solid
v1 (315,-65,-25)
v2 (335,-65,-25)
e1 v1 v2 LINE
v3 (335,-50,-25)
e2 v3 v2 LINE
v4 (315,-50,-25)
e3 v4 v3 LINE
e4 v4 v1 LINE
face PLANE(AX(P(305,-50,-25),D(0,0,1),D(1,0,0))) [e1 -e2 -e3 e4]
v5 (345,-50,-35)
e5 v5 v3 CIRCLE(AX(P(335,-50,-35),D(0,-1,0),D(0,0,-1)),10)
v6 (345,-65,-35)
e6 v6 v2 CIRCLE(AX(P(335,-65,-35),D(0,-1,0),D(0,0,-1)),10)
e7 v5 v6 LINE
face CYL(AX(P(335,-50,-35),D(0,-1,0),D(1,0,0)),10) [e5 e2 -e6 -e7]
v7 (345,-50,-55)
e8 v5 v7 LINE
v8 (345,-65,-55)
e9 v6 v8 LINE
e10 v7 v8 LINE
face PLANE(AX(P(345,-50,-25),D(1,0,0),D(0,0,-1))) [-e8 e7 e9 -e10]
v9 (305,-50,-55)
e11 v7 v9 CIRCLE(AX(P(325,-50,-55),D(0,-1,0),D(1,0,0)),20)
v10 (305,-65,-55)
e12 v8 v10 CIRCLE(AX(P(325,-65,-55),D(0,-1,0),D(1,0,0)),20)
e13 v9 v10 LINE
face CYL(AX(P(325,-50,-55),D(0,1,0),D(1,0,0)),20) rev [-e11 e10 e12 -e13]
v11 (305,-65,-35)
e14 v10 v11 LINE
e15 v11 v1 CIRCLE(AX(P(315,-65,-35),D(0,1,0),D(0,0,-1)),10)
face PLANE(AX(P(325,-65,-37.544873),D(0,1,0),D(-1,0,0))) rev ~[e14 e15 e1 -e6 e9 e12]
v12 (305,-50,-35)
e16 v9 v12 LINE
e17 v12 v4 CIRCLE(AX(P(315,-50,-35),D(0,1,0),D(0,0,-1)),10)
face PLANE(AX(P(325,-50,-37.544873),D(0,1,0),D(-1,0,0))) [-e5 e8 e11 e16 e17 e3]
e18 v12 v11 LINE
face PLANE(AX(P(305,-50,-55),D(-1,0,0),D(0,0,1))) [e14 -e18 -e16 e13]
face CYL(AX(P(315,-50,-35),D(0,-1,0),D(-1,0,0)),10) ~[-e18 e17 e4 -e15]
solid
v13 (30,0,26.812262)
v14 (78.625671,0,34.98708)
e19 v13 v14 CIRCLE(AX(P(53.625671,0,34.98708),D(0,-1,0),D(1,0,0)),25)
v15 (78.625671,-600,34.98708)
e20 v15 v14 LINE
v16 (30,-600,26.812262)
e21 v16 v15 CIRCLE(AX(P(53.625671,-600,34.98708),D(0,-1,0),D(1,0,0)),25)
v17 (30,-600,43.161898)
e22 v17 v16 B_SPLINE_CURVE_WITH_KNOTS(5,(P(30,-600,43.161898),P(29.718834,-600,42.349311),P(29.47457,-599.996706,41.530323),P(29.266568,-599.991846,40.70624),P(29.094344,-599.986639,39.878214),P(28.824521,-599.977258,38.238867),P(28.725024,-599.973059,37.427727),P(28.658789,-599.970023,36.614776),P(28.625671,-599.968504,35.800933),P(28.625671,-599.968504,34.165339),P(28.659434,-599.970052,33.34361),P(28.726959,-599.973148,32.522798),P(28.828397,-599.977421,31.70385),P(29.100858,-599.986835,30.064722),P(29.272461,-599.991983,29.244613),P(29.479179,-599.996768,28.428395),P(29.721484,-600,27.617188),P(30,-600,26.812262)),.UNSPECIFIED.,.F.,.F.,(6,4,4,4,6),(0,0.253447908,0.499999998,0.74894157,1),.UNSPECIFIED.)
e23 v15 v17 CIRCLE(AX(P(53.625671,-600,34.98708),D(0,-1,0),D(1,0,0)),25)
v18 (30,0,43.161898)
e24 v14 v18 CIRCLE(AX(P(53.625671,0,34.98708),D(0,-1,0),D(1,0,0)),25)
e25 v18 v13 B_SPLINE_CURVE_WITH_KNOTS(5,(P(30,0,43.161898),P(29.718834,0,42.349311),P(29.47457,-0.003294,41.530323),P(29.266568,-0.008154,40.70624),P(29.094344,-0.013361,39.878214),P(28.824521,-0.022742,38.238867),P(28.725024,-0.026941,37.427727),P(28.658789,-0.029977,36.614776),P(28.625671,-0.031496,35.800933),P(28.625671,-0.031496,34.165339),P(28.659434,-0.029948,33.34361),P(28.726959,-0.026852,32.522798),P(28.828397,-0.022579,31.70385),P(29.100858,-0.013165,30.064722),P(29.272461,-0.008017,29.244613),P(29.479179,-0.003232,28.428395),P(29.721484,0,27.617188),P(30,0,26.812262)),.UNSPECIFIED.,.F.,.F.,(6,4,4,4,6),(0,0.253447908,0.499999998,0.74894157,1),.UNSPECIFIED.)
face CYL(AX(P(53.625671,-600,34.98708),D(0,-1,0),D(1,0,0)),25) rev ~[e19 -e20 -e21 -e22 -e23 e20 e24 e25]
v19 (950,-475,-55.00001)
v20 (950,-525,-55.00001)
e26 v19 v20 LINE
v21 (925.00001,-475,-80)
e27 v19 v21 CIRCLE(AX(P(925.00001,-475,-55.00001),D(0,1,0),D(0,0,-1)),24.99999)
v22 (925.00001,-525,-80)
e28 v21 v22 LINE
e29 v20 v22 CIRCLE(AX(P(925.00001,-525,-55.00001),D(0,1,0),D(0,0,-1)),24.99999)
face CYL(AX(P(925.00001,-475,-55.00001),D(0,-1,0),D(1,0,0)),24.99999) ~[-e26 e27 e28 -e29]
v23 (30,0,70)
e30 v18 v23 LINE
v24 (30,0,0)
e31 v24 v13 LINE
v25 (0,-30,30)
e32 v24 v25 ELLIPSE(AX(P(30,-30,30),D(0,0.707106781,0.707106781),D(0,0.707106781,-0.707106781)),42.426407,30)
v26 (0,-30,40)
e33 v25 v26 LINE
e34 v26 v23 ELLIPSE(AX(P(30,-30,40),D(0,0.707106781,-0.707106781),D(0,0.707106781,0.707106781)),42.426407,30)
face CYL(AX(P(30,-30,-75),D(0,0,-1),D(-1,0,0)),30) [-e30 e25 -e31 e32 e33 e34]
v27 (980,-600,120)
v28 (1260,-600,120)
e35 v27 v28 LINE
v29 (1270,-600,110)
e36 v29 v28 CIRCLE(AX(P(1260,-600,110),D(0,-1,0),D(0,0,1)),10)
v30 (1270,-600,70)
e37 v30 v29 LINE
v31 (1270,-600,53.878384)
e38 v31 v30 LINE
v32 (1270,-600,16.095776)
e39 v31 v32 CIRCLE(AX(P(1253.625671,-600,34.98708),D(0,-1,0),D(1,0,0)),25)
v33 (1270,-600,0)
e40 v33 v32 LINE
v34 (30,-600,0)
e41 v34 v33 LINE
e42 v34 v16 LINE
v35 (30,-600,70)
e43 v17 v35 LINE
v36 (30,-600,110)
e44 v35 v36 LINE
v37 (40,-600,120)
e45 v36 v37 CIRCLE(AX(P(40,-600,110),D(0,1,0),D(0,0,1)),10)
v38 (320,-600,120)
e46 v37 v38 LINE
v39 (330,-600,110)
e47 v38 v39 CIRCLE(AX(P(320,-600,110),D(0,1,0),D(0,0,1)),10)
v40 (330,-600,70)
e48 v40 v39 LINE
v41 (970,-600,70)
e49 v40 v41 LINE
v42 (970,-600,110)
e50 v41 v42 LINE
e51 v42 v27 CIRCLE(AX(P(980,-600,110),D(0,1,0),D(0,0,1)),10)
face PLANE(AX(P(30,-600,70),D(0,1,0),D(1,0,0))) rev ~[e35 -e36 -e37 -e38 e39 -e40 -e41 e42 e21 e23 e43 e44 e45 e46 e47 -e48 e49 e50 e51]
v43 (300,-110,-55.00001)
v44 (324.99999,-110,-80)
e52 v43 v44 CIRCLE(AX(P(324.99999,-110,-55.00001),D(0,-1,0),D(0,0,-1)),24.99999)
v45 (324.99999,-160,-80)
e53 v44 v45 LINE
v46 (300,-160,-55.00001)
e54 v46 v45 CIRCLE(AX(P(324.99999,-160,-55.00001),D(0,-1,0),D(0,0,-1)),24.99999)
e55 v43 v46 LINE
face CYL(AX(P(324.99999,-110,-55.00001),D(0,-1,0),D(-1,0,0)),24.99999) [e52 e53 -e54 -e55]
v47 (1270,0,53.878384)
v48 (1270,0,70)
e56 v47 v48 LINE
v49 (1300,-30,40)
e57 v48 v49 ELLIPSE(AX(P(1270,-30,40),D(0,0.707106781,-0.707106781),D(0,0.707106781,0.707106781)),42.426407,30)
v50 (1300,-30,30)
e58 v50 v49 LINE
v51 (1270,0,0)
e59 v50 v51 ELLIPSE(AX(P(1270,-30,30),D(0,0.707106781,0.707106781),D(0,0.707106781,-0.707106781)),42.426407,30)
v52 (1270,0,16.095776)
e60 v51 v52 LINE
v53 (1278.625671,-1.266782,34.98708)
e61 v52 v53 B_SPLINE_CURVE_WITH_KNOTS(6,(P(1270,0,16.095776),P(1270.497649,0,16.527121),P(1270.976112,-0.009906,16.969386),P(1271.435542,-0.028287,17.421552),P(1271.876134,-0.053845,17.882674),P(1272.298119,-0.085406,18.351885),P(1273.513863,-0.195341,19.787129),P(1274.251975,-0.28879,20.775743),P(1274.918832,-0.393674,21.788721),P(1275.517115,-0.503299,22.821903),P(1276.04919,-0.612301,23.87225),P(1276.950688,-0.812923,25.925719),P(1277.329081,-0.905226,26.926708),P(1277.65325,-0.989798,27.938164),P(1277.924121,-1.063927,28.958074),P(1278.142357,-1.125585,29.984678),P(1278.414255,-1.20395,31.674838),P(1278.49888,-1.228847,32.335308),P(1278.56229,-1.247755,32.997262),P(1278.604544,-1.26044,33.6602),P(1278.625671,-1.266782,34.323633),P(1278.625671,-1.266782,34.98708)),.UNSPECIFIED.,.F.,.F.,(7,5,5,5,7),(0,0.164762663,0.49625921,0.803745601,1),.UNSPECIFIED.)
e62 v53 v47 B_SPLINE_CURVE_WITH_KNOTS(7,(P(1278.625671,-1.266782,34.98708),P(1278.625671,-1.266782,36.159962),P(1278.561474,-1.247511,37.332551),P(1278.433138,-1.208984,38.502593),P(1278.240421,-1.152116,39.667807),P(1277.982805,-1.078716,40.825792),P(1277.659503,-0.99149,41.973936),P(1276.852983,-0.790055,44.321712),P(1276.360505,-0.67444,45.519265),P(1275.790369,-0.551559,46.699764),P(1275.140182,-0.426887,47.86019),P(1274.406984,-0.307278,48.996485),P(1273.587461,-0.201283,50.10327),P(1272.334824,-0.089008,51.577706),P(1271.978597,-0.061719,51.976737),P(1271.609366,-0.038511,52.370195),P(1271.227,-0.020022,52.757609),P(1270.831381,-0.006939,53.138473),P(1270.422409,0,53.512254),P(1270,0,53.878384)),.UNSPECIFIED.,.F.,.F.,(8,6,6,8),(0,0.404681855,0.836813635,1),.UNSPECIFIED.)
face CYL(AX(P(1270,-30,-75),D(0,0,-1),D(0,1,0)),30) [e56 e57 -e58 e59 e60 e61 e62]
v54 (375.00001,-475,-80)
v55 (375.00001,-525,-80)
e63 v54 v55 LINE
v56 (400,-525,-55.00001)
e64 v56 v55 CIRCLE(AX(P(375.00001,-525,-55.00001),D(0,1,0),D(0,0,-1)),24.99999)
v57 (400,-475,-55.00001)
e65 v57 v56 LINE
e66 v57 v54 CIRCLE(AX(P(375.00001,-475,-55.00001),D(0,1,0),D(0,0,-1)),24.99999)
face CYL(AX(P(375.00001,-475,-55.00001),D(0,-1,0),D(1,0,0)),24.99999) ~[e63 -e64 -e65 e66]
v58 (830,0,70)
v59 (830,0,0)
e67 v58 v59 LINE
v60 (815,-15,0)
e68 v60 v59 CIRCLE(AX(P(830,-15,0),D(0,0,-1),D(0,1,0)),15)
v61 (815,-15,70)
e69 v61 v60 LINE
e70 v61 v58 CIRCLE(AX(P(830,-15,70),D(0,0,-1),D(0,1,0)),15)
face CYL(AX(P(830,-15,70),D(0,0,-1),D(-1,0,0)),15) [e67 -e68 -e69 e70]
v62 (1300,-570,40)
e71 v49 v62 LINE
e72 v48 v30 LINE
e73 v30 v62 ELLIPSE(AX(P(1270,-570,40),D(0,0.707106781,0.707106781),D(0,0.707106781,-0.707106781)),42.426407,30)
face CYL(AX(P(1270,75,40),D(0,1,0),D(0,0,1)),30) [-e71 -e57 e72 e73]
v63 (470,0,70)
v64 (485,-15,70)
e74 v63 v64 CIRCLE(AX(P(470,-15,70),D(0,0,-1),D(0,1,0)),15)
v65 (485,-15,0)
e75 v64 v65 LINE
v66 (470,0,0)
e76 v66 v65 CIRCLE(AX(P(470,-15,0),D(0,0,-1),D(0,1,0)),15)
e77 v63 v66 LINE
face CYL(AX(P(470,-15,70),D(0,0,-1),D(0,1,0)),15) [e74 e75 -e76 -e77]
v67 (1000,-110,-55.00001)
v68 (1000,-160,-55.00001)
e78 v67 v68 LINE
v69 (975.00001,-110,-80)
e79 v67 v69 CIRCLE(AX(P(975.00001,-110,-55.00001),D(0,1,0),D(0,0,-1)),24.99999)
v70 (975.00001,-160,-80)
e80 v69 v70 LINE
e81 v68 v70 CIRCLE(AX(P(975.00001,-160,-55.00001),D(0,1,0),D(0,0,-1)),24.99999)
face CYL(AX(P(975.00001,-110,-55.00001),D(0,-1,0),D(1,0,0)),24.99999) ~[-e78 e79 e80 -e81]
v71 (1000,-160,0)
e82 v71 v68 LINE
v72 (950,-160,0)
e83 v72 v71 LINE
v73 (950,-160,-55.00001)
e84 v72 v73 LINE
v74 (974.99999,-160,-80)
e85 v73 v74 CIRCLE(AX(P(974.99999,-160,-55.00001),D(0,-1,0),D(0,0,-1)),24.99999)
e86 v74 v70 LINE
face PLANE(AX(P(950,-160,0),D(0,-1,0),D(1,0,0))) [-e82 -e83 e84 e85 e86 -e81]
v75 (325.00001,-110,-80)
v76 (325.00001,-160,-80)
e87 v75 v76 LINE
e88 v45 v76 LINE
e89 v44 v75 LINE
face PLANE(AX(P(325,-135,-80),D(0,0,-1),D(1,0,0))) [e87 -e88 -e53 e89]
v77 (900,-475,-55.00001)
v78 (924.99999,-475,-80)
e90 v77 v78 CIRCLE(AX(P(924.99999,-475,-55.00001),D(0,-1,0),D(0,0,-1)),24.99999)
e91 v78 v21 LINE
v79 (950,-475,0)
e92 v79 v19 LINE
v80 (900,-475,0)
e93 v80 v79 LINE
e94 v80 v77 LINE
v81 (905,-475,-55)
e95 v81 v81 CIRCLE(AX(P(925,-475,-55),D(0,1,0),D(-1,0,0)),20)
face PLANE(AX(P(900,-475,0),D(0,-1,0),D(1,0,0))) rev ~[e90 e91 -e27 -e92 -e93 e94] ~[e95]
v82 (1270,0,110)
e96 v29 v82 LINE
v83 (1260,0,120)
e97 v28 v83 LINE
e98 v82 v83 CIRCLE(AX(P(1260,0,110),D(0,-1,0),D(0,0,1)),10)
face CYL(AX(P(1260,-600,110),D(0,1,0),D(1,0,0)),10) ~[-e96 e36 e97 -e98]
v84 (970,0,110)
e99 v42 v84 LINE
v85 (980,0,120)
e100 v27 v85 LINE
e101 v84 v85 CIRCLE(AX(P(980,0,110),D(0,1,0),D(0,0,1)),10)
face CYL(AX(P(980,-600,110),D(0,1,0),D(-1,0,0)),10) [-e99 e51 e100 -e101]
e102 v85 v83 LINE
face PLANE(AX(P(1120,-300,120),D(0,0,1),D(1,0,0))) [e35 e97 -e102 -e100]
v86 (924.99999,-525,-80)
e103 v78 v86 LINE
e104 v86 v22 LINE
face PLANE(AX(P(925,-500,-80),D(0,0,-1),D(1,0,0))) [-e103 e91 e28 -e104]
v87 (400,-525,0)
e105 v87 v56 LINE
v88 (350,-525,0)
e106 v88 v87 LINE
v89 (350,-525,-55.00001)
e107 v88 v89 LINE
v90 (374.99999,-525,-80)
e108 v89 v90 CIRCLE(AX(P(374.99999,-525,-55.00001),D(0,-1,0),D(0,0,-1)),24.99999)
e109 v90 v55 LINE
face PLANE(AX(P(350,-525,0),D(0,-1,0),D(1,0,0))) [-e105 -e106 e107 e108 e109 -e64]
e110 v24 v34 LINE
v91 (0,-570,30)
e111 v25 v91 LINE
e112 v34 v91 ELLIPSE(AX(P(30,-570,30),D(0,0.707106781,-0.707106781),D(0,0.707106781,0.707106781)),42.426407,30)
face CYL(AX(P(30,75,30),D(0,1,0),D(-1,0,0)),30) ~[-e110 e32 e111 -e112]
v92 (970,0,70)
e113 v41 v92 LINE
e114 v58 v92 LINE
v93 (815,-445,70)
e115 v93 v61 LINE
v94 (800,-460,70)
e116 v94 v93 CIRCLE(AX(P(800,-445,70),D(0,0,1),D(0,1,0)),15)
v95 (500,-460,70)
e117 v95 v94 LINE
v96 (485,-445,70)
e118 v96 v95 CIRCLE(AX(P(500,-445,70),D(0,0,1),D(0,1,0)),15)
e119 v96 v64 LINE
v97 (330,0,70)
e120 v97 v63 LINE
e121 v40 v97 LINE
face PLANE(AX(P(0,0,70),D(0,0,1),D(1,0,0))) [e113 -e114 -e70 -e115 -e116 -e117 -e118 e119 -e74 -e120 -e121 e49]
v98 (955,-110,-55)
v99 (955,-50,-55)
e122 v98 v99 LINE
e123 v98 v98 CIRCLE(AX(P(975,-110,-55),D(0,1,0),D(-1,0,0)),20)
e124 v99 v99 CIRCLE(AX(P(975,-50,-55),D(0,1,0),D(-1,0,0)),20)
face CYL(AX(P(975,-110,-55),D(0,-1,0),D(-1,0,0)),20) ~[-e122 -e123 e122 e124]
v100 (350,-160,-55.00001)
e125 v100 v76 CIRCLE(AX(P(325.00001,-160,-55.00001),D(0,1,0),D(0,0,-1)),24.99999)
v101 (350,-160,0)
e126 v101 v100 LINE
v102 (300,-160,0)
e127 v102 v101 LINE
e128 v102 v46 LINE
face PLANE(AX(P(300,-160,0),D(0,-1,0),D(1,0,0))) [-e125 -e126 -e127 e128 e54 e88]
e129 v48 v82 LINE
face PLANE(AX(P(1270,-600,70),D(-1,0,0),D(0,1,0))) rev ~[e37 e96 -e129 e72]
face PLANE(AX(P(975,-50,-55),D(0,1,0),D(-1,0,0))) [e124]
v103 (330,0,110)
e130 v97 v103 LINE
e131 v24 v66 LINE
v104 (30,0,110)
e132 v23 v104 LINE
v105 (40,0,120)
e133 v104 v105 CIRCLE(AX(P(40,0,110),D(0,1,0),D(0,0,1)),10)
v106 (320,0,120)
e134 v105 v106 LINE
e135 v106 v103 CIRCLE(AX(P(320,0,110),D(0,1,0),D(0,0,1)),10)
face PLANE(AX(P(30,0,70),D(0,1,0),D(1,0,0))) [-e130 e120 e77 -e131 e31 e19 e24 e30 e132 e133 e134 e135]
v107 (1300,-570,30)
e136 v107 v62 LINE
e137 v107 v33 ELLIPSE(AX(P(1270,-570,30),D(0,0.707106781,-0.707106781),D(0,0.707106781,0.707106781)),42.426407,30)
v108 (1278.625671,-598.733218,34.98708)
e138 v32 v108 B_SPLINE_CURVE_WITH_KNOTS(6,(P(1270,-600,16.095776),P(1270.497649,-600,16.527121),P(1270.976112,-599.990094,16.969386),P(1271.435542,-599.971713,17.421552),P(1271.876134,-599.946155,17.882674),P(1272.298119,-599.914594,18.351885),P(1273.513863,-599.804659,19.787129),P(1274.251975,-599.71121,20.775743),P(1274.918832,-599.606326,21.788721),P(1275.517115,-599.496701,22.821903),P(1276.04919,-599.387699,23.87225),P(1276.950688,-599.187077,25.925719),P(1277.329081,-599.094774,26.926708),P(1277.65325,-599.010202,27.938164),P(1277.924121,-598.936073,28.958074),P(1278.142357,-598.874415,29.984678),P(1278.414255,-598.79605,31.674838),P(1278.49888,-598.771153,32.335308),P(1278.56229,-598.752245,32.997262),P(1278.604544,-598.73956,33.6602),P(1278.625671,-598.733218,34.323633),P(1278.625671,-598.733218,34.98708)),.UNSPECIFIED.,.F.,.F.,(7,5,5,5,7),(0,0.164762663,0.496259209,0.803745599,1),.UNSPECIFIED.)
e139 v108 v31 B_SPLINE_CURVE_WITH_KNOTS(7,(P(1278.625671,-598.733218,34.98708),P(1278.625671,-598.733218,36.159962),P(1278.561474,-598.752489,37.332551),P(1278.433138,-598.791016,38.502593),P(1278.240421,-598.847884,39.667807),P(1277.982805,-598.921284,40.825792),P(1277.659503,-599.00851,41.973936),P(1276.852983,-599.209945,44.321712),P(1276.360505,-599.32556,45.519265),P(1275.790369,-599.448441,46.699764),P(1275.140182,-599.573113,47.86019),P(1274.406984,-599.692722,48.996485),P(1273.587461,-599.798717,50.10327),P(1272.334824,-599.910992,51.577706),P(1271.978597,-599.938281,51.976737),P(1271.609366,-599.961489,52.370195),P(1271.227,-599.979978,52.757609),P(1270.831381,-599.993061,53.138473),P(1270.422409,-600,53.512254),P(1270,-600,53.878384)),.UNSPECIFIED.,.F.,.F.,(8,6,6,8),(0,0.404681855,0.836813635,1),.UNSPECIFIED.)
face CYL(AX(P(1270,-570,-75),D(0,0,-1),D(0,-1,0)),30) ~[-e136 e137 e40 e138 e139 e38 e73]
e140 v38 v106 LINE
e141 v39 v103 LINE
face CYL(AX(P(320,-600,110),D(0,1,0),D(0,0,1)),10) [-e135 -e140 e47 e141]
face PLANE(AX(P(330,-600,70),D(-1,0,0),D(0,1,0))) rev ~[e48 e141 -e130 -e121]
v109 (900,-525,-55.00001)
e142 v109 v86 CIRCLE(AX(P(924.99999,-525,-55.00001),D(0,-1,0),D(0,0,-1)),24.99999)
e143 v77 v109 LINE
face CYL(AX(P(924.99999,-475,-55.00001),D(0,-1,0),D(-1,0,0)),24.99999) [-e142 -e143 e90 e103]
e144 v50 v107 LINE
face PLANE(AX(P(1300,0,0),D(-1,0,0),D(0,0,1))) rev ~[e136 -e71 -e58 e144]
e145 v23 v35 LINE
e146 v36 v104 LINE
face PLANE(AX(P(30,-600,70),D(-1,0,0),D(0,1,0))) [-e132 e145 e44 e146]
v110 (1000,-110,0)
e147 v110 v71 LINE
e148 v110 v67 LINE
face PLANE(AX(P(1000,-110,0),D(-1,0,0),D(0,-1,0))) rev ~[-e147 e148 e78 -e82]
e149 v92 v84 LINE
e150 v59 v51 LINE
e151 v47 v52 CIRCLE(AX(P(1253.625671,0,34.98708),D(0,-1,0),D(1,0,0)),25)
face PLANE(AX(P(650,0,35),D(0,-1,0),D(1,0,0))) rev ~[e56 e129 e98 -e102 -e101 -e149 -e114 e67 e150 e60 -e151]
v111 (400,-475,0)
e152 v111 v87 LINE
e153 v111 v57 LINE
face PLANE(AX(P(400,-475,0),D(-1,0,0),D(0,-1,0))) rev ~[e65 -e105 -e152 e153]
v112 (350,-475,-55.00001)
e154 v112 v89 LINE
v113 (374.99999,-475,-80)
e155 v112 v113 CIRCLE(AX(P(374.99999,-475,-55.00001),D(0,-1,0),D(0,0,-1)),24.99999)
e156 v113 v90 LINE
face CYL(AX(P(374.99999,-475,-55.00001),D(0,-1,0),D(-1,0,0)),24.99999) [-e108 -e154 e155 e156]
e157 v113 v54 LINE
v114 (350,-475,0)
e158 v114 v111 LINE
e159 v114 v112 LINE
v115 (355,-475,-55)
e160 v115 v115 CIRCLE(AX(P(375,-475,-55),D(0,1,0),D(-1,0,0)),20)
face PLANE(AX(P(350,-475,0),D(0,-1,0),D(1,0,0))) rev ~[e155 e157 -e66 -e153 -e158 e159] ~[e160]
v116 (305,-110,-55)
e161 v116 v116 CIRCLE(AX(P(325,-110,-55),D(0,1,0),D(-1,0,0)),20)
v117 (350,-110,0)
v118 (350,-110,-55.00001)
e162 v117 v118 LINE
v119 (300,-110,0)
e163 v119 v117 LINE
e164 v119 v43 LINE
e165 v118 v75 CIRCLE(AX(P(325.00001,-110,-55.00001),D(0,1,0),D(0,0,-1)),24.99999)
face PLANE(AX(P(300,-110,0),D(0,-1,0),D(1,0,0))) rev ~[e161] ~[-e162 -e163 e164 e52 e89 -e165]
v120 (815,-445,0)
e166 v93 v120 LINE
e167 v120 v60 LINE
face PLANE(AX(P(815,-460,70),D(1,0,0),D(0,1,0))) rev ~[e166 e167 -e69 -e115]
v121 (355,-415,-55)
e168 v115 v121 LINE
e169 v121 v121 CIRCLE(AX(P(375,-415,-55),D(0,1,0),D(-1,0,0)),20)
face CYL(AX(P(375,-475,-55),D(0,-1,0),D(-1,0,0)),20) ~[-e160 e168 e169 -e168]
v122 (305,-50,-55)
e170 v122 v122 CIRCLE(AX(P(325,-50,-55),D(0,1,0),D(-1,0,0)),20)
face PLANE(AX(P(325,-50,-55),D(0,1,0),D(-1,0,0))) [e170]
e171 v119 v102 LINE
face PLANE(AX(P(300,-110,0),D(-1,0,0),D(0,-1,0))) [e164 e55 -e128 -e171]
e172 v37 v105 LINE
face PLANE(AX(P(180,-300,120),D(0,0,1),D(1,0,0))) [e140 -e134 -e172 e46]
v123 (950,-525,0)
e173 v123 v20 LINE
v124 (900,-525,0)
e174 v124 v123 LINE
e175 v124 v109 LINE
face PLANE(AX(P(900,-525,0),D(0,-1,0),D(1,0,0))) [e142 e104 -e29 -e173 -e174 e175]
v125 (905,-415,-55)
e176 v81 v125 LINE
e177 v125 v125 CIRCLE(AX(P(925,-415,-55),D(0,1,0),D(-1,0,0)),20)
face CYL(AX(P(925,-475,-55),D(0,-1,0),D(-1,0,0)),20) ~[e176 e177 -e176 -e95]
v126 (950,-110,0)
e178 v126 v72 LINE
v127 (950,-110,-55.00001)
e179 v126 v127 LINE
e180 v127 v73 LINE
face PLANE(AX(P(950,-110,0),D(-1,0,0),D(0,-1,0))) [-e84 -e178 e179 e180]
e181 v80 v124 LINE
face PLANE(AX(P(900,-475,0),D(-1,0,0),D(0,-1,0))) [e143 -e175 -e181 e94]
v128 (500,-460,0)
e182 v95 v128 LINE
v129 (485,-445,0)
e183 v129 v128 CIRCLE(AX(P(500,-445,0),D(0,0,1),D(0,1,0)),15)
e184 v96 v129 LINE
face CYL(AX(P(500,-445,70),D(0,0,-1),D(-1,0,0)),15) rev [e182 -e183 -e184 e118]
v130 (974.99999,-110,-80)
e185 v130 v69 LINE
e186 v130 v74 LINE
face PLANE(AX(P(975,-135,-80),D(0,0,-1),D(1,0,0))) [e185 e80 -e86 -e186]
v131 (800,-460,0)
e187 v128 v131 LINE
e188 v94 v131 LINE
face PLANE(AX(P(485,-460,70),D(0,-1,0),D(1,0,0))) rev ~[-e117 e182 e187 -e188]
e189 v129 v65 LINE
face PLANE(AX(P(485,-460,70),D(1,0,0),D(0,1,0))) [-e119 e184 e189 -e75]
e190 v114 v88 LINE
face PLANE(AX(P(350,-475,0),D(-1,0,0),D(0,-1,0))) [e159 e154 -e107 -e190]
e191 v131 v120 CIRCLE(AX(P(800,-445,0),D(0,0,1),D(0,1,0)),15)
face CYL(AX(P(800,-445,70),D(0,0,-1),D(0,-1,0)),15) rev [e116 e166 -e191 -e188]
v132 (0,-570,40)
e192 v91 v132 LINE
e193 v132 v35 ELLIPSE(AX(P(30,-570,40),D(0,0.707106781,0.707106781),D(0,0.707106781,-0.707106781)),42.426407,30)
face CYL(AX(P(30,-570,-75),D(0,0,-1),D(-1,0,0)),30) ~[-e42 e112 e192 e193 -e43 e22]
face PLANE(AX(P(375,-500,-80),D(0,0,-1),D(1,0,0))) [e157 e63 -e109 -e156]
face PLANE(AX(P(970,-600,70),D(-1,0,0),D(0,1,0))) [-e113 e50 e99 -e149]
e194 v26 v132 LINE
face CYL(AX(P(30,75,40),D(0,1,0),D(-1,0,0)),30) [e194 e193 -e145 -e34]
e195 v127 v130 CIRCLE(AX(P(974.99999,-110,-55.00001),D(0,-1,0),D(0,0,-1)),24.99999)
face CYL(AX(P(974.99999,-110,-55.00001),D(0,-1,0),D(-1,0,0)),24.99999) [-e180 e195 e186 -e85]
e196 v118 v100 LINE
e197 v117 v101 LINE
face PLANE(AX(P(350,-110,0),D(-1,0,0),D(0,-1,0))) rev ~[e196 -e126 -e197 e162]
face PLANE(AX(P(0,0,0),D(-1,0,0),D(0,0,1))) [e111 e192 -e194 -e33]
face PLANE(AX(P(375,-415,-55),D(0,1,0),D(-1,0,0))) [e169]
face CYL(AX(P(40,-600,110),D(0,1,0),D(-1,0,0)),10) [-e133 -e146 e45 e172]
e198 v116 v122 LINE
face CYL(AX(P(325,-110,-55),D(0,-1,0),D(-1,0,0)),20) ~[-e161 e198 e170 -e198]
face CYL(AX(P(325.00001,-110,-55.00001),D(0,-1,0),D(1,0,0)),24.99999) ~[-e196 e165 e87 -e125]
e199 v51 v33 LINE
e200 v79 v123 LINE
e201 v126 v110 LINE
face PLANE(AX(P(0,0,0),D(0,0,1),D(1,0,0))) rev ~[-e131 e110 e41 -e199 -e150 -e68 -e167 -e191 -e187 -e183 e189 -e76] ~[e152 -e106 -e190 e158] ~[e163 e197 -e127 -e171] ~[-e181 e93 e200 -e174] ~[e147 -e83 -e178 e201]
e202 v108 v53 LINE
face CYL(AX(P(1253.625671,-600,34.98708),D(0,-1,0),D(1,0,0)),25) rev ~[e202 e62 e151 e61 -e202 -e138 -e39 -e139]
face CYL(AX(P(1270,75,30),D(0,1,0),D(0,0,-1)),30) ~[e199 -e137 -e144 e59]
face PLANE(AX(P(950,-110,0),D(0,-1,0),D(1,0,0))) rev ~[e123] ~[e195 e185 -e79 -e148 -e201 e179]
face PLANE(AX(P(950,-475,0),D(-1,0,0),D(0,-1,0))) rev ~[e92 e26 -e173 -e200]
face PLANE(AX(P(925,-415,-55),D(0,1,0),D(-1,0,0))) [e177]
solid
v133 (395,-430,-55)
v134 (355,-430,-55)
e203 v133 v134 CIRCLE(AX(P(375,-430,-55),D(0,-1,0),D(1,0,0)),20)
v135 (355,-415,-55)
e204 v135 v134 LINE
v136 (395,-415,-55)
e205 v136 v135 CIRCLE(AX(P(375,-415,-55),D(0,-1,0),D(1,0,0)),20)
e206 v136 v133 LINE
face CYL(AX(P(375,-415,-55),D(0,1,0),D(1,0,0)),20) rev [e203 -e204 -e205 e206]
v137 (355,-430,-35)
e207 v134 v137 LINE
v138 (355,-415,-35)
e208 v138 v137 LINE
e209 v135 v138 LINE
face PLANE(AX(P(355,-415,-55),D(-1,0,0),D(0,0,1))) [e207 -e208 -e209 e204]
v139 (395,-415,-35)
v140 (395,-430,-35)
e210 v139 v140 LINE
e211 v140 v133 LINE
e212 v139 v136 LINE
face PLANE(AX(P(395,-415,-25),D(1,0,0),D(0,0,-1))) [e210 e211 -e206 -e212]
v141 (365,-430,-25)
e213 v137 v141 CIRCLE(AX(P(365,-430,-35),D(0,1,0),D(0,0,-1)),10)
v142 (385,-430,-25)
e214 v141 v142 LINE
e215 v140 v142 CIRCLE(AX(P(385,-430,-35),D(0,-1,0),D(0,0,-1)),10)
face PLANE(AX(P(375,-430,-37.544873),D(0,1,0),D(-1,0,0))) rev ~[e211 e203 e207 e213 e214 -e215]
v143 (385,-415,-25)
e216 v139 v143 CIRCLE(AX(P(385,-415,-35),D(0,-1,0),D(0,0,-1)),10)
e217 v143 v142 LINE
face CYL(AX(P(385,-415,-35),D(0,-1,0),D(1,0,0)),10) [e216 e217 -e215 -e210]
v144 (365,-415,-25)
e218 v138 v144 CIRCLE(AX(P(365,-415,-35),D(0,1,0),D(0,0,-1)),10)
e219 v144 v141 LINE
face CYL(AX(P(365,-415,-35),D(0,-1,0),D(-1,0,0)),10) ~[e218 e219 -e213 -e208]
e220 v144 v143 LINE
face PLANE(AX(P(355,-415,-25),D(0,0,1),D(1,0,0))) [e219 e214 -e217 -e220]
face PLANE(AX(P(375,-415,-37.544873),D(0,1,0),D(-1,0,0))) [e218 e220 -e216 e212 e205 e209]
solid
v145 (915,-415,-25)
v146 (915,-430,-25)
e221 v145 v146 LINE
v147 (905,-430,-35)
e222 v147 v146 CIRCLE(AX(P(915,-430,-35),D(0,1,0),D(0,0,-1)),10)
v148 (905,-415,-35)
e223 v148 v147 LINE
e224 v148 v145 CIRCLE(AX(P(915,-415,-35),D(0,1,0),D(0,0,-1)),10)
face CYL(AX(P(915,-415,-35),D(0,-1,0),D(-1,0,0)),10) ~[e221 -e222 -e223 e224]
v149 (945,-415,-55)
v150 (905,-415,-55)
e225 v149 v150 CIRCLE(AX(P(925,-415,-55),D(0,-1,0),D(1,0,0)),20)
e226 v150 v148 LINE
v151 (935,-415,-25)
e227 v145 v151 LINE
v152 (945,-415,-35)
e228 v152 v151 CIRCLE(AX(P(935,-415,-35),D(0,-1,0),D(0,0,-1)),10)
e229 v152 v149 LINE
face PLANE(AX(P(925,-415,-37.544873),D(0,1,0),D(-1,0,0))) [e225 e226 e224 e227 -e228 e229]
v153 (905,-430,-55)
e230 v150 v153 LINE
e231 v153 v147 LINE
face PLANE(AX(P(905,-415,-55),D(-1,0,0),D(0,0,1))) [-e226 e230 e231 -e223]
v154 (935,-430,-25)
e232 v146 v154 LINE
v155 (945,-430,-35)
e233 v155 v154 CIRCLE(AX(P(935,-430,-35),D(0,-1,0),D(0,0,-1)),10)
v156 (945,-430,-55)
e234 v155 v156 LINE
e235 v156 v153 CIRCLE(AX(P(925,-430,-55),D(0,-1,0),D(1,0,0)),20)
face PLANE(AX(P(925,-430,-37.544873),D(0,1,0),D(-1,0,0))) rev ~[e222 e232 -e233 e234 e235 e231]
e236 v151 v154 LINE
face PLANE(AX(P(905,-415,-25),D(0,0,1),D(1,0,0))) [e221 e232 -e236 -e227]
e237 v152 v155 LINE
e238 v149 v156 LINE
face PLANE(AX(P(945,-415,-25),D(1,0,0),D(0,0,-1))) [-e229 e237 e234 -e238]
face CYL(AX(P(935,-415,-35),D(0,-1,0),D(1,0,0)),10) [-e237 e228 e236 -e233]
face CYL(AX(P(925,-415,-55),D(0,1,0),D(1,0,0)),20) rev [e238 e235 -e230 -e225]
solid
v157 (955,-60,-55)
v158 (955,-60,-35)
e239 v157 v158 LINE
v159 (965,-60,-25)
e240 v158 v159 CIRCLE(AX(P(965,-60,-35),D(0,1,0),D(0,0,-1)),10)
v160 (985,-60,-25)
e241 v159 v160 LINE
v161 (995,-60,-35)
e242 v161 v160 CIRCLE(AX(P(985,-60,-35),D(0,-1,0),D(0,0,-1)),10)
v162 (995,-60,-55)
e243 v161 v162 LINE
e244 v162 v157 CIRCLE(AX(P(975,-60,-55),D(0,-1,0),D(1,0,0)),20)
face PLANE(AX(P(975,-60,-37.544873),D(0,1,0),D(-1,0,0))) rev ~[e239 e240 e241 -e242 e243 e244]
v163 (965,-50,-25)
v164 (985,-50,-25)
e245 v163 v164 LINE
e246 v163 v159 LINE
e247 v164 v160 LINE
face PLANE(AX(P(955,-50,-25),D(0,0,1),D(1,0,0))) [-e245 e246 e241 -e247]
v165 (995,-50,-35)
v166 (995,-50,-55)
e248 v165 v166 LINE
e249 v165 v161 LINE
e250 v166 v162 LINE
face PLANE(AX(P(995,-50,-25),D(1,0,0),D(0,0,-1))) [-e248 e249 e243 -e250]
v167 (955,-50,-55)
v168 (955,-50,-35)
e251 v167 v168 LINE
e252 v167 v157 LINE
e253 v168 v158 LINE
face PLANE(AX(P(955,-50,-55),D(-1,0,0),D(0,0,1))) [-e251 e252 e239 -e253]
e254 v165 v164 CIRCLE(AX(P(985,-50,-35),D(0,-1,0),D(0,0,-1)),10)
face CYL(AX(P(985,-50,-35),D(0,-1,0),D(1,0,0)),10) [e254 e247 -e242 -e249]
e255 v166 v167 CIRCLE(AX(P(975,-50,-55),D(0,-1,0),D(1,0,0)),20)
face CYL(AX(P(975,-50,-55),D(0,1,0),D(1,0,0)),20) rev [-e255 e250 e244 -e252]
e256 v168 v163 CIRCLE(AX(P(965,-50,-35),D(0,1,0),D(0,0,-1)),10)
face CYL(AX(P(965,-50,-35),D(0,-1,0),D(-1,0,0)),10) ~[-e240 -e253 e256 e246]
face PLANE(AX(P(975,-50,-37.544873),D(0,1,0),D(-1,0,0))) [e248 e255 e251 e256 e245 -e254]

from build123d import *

# Parameters (mm, degrees)
F0_W        = 1300
F0_H        = 70
F1_DEPTH    = 600
F2_R        = 25
F3_DEPTH    = 800
F4_T1_DEPTH = 750
F4_T3_DEPTH = 220
F5_W        = 330
F5_H        = 460
F6_DEPTH    = 100
F7_R        = 15
F8_W        = 50
F8_H        = 50
F9_DEPTH    = 80
F10_R       = 24.99999
F11_R       = 20
F12_DEPTH   = 60
F13_R       = 20
F14_DEPTH   = 60
F15_R       = 20
F16_DEPTH   = 60
F17_R       = 20
F18_DEPTH   = 60
F19_W       = 300
F19_H       = 600
F20_DEPTH   = 50
F21_R       = 10
F23_DEPTH   = 10
F25_DEPTH   = 15
F26_R       = 10
F28_DEPTH   = 15
F30_DEPTH   = 15
F31_R       = 10
F31_2_R     = 10
F31_3_R     = 10


# Not quite as in the source:
# - a fillet or chamfer that OpenCascade refuses, or shapes differently, is made with other operations: its cross-section is extruded or revolved along the edge and cut away or added
# - a fillet or chamfer is up to 0.001 mm smaller than in the source, because OpenCascade refuses the exact size


with BuildPart() as f1:
    # F0 (on Front) → F1 (new body)
    with BuildSketch(Plane.XZ):
        with Locations((650, 35)):
            Rectangle(F0_W, F0_H)
    extrude(amount=F1_DEPTH)

    # F2 (on face) → F3 (cut)
    with BuildSketch(Plane.XZ.offset(600)):
        with Locations((53.6256714825, 34.9870798825)):
            Circle(F2_R)
        with Locations((1253.6256714825, 34.9870798825)):
            Circle(F2_R)
    extrude(amount=-F3_DEPTH, mode=Mode.SUBTRACT)

    # F4: fillet of radius 30 on 8 edges, made by hand

    # F4_s2 → F4_t1 (cut)
    with BuildSketch(Plane.XZ.offset(-75)):
        with BuildLine():
            ThreePointArc((0, 40), (8.7867965644, 61.2132034356), (30, 70))
            Line((30, 70), (0, 70))
            Line((0, 70), (0, 40))
        make_face()
        with BuildLine():
            ThreePointArc((0, 30), (8.7867965644, 8.7867965644), (30, 0))
            Line((30, 0), (0, 0))
            Line((0, 0), (0, 30))
        make_face()
        with BuildLine():
            ThreePointArc((1270, 0), (1291.2132034356, 8.7867965644), (1300, 30))
            Line((1300, 30), (1300, 0))
            Line((1300, 0), (1270, 0))
        make_face()
        with BuildLine():
            ThreePointArc((1270, 70), (1291.2132034356, 61.2132034356), (1300, 40))
            Line((1300, 40), (1300, 70))
            Line((1300, 70), (1270, 70))
        make_face()
    extrude(amount=F4_T1_DEPTH, mode=Mode.SUBTRACT)

    # F4_s4 → F4_t3 (cut)
    with BuildSketch(Plane.XY.offset(-75)):
        with BuildLine():
            ThreePointArc((0, -30), (8.7867965644, -8.7867965644), (30, 0))
            Line((30, 0), (0, 0))
            Line((0, 0), (0, -30))
        make_face()
        with BuildLine():
            ThreePointArc((0, -570), (8.7867965644, -591.2132034356), (30, -600))
            Line((30, -600), (0, -600))
            Line((0, -600), (0, -570))
        make_face()
        with BuildLine():
            ThreePointArc((1270, 0), (1291.2132034356, -8.7867965644), (1300, -30))
            Line((1300, -30), (1300, 0))
            Line((1300, 0), (1270, 0))
        make_face()
        with BuildLine():
            ThreePointArc((1270, -600), (1291.2132034356, -591.2132034356), (1300, -570))
            Line((1300, -570), (1300, -600))
            Line((1300, -600), (1270, -600))
        make_face()
    extrude(amount=F4_T3_DEPTH, mode=Mode.SUBTRACT)

    # F5 (on face) → F6 (cut)
    with BuildSketch(Plane.XY.offset(70)):
        with Locations((650, -230)):
            Rectangle(F5_W, F5_H)
    extrude(amount=-F6_DEPTH, mode=Mode.SUBTRACT)

    # F7
    f7_edges = [f1.edges().sort_by_distance(p)[0] for p in [
        (815, 0, 35),
        (485, 0, 35),
        (485, -460, 35),
        (815, -460, 35),
    ]]
    fillet(f7_edges, radius=F7_R)

    # F8 (on face) → F9 (join)
    with BuildSketch(Plane(origin=(0, 0, 0), x_dir=(1, 0, 0), z_dir=(0, 0, -1))):
        with Locations((375, 500)):
            Rectangle(F8_W, F8_H)
        with Locations((925, 500)):
            Rectangle(F8_W, F8_H)
        with Locations((975, 135)):
            Rectangle(F8_W, F8_H)
        with Locations((325, 135)):
            Rectangle(F8_W, F8_H)
    extrude(amount=F9_DEPTH)

    # F10 (radius 25 in the source; OpenCascade refuses exactly that, so slightly less here)
    f10_edges = [f1.edges().sort_by_distance(p)[0] for p in [
        (350, -500, -80),
        (400, -500, -80),
        (350, -135, -80),
        (300, -135, -80),
        (950, -500, -80),
        (900, -500, -80),
        (950, -135, -80),
        (1000, -135, -80),
    ]]
    fillet(f10_edges, radius=F10_R)

    # F11 (on face) → F12 (join)
    with BuildSketch(Plane(origin=(0, -110, 0), x_dir=(-1, 0, 0), z_dir=(0, 1, 0))):
        with Locations((-975, -55)):
            Circle(F11_R)
    extrude(amount=F12_DEPTH)

    # F13 (on face) → F14 (join)
    with BuildSketch(Plane(origin=(0, -110, 0), x_dir=(-1, 0, 0), z_dir=(0, 1, 0))):
        with Locations((-325, -55)):
            Circle(F13_R)
    extrude(amount=F14_DEPTH)

    # F15 (on face) → F16 (join)
    with BuildSketch(Plane(origin=(0, -475, 0), x_dir=(-1, 0, 0), z_dir=(0, 1, 0))):
        with Locations((-375, -55)):
            Circle(F15_R)
    extrude(amount=F16_DEPTH)

    # F17 (on face) → F18 (join)
    with BuildSketch(Plane(origin=(0, -475, 0), x_dir=(-1, 0, 0), z_dir=(0, 1, 0))):
        with Locations((-925, -55)):
            Circle(F17_R)
    extrude(amount=F18_DEPTH)

    # F19 (on face) → F20 (join)
    with BuildSketch(Plane.XY.offset(70)):
        with Locations((180, -300)):
            Rectangle(F19_W, F19_H)
        with Locations((1120, -300)):
            Rectangle(F19_W, F19_H)
    extrude(amount=F20_DEPTH)

    # F21
    f21_edges = [f1.edges().sort_by_distance(p)[0] for p in [
        (1270, -300, 120),
        (30, -300, 120),
        (330, -300, 120),
        (970, -300, 120),
    ]]
    fillet(f21_edges, radius=F21_R)


with BuildPart() as f23:
    # F22 (on face) → F23 (new body)
    with BuildSketch(Plane(origin=(0, -50, 0), x_dir=(-1, 0, 0), z_dir=(0, 1, 0))):
        with BuildLine():
            Line((-995, -25), (-995, -55))
            ThreePointArc((-995, -55), (-975, -35), (-955, -55))
            Line((-955, -55), (-955, -25))
            Line((-955, -25), (-995, -25))
        make_face()
    extrude(amount=-F23_DEPTH)

    # F26
    f26_edges = [f23.edges().sort_by_distance(p)[0] for p in [
        (995, -55, -25),
        (955, -55, -25),
    ]]
    fillet(f26_edges, radius=F26_R)


with BuildPart() as f25:
    # F24 (on face) → F25 (new body)
    with BuildSketch(Plane(origin=(0, -415, 0), x_dir=(-1, 0, 0), z_dir=(0, 1, 0))):
        with BuildLine():
            Line((-945, -25), (-945, -55))
            ThreePointArc((-945, -55), (-925, -35), (-905, -55))
            Line((-905, -55), (-905, -25))
            Line((-905, -25), (-945, -25))
        make_face()
    extrude(amount=-F25_DEPTH)

    # F31
    f31_edges = [f25.edges().sort_by_distance(p)[0] for p in [
        (905, -422.5, -25),
        (945, -422.5, -25),
    ]]
    fillet(f31_edges, radius=F31_R)


with BuildPart() as f28:
    # F27 (on face) → F28 (new body)
    with BuildSketch(Plane(origin=(0, -50, 0), x_dir=(-1, 0, 0), z_dir=(0, 1, 0))):
        with BuildLine():
            Line((-345, -25), (-345, -55))
            ThreePointArc((-345, -55), (-325, -35), (-305, -55))
            Line((-305, -55), (-305, -25))
            Line((-305, -25), (-345, -25))
        make_face()
    extrude(amount=-F28_DEPTH)

    # F31#2
    f31_2_edges = [f28.edges().sort_by_distance(p)[0] for p in [
        (345, -57.5, -25),
        (305, -57.5, -25),
    ]]
    fillet(f31_2_edges, radius=F31_2_R)


with BuildPart() as f30:
    # F29 (on face) → F30 (new body)
    with BuildSketch(Plane(origin=(0, -415, 0), x_dir=(-1, 0, 0), z_dir=(0, 1, 0))):
        with BuildLine():
            Line((-395, -25), (-395, -55))
            ThreePointArc((-395, -55), (-375, -35), (-355, -55))
            Line((-355, -55), (-355, -25))
            Line((-355, -25), (-395, -25))
        make_face()
    extrude(amount=-F30_DEPTH)

    # F31#3
    f31_3_edges = [f30.edges().sort_by_distance(p)[0] for p in [
        (395, -422.5, -25),
        (355, -422.5, -25),
    ]]
    fillet(f31_3_edges, radius=F31_3_R)


solid = Compound([f1.part, f23.part, f25.part, f28.part, f30.part])
